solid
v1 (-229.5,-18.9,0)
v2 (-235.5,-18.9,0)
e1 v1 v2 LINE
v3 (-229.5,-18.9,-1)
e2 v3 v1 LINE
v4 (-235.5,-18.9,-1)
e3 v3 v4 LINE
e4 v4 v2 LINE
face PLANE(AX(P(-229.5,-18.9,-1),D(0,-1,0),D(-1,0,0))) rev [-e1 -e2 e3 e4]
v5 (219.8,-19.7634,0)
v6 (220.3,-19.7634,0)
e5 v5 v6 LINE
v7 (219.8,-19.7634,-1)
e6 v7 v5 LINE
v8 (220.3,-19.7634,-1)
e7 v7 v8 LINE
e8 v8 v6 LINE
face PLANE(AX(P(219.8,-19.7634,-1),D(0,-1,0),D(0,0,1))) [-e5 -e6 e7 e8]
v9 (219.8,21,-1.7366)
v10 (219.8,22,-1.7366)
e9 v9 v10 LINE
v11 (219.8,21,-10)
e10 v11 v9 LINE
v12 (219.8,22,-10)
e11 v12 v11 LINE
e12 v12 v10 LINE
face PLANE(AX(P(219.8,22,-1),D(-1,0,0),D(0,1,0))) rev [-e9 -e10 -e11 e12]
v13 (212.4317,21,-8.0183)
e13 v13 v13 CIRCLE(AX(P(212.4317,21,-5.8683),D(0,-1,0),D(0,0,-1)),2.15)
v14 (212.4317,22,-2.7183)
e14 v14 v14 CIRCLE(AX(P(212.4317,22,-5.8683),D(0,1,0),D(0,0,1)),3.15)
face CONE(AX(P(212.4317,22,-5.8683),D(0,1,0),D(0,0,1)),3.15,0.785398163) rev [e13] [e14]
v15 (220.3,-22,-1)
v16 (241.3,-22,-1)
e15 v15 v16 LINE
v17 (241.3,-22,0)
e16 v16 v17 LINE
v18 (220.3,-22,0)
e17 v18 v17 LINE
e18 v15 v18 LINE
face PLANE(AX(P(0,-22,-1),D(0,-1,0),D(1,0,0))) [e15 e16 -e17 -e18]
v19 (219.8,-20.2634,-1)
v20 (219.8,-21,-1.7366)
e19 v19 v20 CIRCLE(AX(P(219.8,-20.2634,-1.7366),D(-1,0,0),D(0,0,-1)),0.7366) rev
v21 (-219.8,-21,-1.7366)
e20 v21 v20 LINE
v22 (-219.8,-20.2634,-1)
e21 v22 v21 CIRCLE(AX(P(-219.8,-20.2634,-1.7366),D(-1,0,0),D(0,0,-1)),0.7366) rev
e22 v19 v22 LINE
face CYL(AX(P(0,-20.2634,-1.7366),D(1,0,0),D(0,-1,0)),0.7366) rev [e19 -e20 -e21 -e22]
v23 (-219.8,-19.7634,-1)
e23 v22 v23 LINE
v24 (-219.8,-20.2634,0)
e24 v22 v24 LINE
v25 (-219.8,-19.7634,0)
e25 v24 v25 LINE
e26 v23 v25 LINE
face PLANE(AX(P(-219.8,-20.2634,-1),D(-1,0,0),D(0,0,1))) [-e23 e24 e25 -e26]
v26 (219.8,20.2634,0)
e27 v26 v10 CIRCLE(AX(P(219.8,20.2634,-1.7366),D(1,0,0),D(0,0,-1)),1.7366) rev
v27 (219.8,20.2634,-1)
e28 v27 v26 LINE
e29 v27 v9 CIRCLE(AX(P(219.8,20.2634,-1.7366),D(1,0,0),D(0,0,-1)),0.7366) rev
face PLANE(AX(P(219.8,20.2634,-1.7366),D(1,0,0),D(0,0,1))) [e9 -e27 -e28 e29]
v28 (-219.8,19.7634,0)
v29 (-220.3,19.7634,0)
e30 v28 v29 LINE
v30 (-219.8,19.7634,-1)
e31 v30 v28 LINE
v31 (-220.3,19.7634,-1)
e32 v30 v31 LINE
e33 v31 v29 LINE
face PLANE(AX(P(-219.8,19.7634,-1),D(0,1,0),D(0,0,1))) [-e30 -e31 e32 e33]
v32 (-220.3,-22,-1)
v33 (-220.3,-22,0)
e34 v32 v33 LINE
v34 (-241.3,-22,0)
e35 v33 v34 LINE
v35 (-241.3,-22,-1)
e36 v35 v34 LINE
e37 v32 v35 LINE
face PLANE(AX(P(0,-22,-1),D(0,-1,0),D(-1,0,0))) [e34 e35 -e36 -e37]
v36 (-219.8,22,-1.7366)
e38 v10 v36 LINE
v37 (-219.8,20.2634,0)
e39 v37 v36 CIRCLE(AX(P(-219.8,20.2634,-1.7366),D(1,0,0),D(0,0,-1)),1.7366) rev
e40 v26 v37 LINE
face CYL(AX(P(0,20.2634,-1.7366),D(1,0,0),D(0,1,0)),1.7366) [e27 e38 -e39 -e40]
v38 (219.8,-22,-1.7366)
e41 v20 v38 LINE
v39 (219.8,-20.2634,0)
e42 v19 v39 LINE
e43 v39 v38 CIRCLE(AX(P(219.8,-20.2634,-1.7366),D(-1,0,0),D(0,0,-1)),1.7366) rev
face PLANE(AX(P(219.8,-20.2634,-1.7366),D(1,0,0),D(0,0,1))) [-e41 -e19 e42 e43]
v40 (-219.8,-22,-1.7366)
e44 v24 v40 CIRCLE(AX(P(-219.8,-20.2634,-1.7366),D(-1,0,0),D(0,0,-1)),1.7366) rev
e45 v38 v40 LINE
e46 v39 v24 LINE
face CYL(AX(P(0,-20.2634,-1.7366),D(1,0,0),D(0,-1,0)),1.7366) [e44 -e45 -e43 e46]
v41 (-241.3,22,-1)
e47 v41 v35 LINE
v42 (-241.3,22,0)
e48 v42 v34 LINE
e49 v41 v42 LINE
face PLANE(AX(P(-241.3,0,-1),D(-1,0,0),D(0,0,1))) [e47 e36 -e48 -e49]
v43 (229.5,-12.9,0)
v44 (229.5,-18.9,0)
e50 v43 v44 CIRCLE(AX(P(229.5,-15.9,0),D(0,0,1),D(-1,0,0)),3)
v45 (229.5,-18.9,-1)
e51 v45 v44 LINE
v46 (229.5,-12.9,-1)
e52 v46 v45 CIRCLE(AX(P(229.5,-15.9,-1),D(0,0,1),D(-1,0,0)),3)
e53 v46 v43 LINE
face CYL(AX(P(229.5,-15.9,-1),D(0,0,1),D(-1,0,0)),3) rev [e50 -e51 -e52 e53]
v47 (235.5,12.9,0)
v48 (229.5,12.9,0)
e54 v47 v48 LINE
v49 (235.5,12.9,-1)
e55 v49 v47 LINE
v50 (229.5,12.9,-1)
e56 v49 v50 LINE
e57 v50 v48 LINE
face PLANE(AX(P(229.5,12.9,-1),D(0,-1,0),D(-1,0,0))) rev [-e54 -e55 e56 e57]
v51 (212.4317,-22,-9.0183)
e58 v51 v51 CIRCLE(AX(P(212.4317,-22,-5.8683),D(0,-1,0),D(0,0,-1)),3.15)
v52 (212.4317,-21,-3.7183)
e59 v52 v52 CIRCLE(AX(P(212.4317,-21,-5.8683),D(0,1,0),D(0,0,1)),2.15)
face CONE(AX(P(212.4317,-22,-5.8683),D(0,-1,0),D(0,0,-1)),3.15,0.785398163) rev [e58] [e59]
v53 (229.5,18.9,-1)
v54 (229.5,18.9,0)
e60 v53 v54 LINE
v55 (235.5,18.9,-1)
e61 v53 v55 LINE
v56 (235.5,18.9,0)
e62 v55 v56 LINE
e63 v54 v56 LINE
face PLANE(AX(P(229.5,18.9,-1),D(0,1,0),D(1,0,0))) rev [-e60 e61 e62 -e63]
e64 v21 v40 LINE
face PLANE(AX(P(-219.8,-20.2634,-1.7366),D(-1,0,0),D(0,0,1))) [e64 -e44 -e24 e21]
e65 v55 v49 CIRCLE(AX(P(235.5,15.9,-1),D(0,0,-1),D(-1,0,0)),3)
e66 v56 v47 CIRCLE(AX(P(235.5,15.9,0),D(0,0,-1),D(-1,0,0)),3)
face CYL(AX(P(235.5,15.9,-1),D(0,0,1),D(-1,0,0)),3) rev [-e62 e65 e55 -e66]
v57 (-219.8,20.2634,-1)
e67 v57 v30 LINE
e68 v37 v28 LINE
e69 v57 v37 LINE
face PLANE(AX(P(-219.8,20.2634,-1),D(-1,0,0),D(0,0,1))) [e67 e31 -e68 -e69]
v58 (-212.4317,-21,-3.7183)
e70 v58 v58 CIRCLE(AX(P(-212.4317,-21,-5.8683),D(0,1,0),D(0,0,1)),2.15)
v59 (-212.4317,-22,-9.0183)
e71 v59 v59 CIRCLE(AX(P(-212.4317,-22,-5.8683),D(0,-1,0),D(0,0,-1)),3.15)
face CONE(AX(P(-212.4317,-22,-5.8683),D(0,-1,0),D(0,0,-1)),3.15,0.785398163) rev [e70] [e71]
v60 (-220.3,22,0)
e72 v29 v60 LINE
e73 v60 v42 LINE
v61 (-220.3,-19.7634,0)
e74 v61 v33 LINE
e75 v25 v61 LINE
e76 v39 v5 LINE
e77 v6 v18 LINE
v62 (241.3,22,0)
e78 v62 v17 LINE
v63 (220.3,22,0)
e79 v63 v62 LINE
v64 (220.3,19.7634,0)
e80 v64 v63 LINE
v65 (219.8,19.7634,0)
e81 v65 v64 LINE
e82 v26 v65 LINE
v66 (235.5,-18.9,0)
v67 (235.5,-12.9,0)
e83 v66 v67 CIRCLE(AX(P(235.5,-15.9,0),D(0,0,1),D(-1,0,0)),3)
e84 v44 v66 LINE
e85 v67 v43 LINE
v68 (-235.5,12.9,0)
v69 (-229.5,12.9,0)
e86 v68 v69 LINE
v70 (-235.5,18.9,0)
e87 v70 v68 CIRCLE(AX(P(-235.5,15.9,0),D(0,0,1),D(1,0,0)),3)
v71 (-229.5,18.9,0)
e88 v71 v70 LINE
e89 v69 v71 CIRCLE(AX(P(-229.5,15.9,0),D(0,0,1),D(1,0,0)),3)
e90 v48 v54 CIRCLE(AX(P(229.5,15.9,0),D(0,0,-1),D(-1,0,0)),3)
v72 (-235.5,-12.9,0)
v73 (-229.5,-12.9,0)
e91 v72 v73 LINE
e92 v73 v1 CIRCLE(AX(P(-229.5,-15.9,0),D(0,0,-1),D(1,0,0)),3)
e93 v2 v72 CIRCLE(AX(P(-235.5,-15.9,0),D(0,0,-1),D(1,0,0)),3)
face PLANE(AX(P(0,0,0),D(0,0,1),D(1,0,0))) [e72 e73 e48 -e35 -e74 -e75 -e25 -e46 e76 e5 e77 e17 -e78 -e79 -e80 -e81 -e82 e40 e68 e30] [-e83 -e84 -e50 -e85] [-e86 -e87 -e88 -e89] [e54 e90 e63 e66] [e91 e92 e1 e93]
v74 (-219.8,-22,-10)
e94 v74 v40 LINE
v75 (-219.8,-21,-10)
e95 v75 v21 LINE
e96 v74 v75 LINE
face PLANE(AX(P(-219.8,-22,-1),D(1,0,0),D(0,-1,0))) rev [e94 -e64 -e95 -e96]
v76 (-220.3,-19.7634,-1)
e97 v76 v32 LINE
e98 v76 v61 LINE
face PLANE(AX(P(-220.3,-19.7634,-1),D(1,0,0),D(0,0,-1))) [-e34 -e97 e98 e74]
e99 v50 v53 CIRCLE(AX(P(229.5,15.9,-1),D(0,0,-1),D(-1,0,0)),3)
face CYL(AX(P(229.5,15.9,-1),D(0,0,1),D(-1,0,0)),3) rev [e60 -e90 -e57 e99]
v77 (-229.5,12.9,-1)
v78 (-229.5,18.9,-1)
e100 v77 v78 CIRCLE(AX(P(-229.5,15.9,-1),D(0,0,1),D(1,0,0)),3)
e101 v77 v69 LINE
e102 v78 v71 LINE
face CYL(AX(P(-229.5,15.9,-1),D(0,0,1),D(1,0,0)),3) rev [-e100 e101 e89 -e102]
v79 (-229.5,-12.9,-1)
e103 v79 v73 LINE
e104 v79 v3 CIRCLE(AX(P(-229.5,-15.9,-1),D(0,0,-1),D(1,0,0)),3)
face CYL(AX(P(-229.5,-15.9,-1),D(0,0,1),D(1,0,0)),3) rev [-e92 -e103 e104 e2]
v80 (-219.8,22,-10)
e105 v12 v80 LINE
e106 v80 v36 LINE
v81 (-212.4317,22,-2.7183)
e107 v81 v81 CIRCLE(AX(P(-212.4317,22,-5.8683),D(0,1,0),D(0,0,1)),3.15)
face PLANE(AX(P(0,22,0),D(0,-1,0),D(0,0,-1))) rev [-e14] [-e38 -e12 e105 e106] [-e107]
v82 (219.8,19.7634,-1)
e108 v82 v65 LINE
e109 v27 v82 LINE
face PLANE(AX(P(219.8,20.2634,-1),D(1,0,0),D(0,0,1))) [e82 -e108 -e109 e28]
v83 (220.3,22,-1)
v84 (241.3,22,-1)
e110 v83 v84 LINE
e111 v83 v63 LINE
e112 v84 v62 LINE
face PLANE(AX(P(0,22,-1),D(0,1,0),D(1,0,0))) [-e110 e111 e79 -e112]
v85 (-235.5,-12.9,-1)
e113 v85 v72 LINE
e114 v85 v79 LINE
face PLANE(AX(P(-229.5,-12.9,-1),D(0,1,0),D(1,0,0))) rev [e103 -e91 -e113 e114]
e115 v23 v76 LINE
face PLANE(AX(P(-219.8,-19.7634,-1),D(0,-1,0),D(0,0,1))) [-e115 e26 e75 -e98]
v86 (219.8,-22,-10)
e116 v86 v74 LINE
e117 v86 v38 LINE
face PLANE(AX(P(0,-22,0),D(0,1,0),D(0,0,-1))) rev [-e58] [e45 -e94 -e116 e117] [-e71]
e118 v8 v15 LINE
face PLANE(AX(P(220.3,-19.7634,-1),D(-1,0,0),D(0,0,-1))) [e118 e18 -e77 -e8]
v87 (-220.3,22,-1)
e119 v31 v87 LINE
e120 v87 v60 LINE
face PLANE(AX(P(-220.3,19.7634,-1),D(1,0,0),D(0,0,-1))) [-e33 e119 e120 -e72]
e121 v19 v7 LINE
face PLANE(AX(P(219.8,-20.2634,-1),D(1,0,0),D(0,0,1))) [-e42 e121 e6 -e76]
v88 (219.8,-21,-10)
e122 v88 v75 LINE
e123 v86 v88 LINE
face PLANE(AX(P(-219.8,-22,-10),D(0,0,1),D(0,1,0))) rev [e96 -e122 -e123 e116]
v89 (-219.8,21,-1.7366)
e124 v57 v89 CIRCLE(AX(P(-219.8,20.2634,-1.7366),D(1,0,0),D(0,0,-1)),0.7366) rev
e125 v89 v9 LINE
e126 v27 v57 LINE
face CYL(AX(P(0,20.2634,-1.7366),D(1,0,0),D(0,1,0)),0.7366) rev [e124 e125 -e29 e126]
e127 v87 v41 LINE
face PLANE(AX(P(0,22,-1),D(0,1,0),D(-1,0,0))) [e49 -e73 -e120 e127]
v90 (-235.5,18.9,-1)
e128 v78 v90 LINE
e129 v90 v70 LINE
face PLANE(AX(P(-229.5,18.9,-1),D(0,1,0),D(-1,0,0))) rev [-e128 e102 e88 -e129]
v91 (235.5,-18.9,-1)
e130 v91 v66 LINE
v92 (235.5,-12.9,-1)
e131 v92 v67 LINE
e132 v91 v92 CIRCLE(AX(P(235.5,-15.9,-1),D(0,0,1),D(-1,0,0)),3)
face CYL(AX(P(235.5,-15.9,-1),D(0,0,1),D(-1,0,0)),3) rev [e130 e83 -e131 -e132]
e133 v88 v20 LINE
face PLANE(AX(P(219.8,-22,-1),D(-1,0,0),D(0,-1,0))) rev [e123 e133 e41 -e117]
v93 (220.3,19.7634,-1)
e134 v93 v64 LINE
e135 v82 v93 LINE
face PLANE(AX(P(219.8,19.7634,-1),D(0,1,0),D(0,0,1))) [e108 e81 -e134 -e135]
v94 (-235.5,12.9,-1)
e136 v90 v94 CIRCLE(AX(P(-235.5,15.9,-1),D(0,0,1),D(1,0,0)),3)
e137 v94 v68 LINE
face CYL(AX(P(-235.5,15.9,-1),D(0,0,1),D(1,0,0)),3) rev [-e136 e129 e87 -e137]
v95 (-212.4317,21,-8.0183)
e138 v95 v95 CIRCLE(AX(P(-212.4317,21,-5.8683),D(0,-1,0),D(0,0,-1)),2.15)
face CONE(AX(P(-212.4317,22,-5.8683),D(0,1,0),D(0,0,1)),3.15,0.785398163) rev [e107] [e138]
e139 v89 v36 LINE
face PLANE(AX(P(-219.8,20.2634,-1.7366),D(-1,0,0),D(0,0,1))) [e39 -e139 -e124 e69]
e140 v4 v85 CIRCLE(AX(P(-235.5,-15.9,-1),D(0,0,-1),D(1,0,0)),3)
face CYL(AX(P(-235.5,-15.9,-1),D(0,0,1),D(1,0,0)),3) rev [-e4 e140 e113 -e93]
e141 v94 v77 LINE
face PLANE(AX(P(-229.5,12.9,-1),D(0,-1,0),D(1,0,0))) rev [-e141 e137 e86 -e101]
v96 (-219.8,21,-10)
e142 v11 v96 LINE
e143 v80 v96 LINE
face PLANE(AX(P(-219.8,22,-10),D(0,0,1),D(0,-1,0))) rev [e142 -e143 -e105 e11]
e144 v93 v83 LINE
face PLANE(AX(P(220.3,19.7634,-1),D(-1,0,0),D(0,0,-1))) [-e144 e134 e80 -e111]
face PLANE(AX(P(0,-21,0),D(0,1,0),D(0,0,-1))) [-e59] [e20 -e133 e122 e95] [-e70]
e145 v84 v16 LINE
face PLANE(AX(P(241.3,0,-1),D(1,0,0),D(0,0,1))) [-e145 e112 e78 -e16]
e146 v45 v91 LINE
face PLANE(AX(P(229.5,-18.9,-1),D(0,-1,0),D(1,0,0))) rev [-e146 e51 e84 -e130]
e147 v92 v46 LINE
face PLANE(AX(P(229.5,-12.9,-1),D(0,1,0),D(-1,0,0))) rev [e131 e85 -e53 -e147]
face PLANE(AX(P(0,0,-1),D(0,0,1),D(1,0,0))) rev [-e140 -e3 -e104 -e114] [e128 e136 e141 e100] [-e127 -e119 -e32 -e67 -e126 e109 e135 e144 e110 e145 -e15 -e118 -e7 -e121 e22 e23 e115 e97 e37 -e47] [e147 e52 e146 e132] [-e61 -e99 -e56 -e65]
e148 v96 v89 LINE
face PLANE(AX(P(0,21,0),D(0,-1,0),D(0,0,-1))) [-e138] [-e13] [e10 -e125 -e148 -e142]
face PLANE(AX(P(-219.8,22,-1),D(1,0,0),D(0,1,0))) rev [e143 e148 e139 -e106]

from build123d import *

# Parameters (mm, degrees)
SKETCH1_W                                           = 241.3
SKETCH1_H                                           = 22
BASE_FLANGE_DEPTH                                   = 1
EDGE_FLANGE_MOUNING_STRIP_W                         = 5.4732
EDGE_FLANGE_MOUNING_STRIP_H                         = 1
EDGE_FLANGE_MOUNING_STRIP_CUT_DEPTH                 = 219.8
EDGE_FLANGE_MOUNING_RELIEF_W                        = 5.9732
EDGE_FLANGE_MOUNING_RELIEF_H                        = 0.5
EDGE_FLANGE_MOUNING_RELIEF_CUT_DEPTH                = 1
EDGE_FLANGE_MOUNING_DEPTH                           = 219.8
CUT_EXTRUDE_MOUNTING_DEPTH                          = 1
CSK_FOR_M3_COUNTERSUNK_FLAT_HEAD_SCREW5_D           = 3.2
CSK_FOR_M3_COUNTERSUNK_FLAT_HEAD_SCREW5_CSINK_D     = 6.3
CSK_FOR_M3_COUNTERSUNK_FLAT_HEAD_SCREW5_CSINK_ANGLE = 90
CSK_FOR_M3_COUNTERSUNK_FLAT_HEAD_SCREW6_D           = 3.2
CSK_FOR_M3_COUNTERSUNK_FLAT_HEAD_SCREW6_CSINK_D     = 6.3
CSK_FOR_M3_COUNTERSUNK_FLAT_HEAD_SCREW6_CSINK_ANGLE = 90


# Sheet-metal steps are written as plain solids
with BuildPart() as part:
    # Sketch1 → Base-Flange (new body)
    with BuildSketch(Plane.XY):
        with Locations((-120.65, 11)):
            Rectangle(SKETCH1_W, SKETCH1_H)
    extrude(amount=-BASE_FLANGE_DEPTH)

    # Edge-Flange-Mouning strip (across the edge) → Edge-Flange-Mouning strip cut (cut)
    with BuildSketch(Plane(origin=(-219.8, 22, -1), x_dir=(0, -1, 0), z_dir=(1, 0, 0))):
        with Locations((-1, -0.5)):
            Rectangle(EDGE_FLANGE_MOUNING_STRIP_W, EDGE_FLANGE_MOUNING_STRIP_H)
    extrude(amount=EDGE_FLANGE_MOUNING_STRIP_CUT_DEPTH, mode=Mode.SUBTRACT)

    # Edge-Flange-Mouning relief (on the sheet) → Edge-Flange-Mouning relief cut (cut)
    with BuildSketch(Plane(origin=(-219.8, 20.2634, -1), x_dir=(0, -1, 0), z_dir=(0, 0, -1))):
        with Locations((-2.4866, 0.25)):
            Rectangle(EDGE_FLANGE_MOUNING_RELIEF_W, EDGE_FLANGE_MOUNING_RELIEF_H)
    extrude(amount=-EDGE_FLANGE_MOUNING_RELIEF_CUT_DEPTH, mode=Mode.SUBTRACT)

    # Edge-Flange-Mouning section (across the edge) → Edge-Flange-Mouning (add)
    with BuildSketch(Plane(origin=(-219.8, 22, -1), x_dir=(0, -1, 0), z_dir=(1, 0, 0))):
        with BuildLine():
            Line((0, 0.7366), (0, 9))
            Line((0, 9), (1, 9))
            Line((1, 9), (1, 0.7366))
            ThreePointArc((1, 0.7366), (1.215745145, 0.215745145), (1.7366, 0))
            Line((1.7366, 0), (1.7366, -1))
            ThreePointArc((1.7366, -1), (0.508638364, -0.491361636), (0, 0.7366))
        make_face()
    extrude(amount=EDGE_FLANGE_MOUNING_DEPTH)

    # Sketch13 → Cut-Extrude-Mounting (cut)
    with BuildSketch(Plane.XY):
        with BuildLine():
            Line((-229.5, 12.9), (-235.5, 12.9))
            ThreePointArc((-235.5, 12.9), (-238.5, 15.9), (-235.5, 18.9))
            Line((-235.5, 18.9), (-229.5, 18.9))
            ThreePointArc((-229.5, 18.9), (-226.5, 15.9), (-229.5, 12.9))
        make_face()
    extrude(amount=-CUT_EXTRUDE_MOUNTING_DEPTH, mode=Mode.SUBTRACT)

    # Mirror-Vertical: part across plane


with BuildPart() as part_1:
    add(part.part)
    add(part.part.mirror(Plane(origin=(0, 0, -1), x_dir=(0, 0, 1), z_dir=(1, 0, 0))))

    # Mirror-Horizontal: part across face


with BuildPart() as part_2:
    add(part_1.part)
    add(part_1.part.mirror(Plane(origin=(0, 0, -0.5), x_dir=(0, 0, 1), z_dir=(0, -1, 0))))

    # CSK for M3 Countersunk Flat Head Screw5 (through all)
    with Locations(Plane(origin=(0, 22, 0), x_dir=(1, 0, 0), z_dir=(0, 1, 0))):
        with Locations((-212.4317, 5.8683), (212.4317, 5.8683)):
            CounterSinkHole(CSK_FOR_M3_COUNTERSUNK_FLAT_HEAD_SCREW5_D / 2, CSK_FOR_M3_COUNTERSUNK_FLAT_HEAD_SCREW5_CSINK_D / 2, counter_sink_angle=CSK_FOR_M3_COUNTERSUNK_FLAT_HEAD_SCREW5_CSINK_ANGLE)

    # CSK for M3 Countersunk Flat Head Screw6 (through all)
    with Locations(Plane(origin=(0, -22, 0), x_dir=(-1, 0, 0), z_dir=(0, -1, 0))):
        with Locations((-212.4317, 5.8683), (212.4317, 5.8683)):
            CounterSinkHole(CSK_FOR_M3_COUNTERSUNK_FLAT_HEAD_SCREW6_D / 2, CSK_FOR_M3_COUNTERSUNK_FLAT_HEAD_SCREW6_CSINK_D / 2, counter_sink_angle=CSK_FOR_M3_COUNTERSUNK_FLAT_HEAD_SCREW6_CSINK_ANGLE)


solid = part_2.part
